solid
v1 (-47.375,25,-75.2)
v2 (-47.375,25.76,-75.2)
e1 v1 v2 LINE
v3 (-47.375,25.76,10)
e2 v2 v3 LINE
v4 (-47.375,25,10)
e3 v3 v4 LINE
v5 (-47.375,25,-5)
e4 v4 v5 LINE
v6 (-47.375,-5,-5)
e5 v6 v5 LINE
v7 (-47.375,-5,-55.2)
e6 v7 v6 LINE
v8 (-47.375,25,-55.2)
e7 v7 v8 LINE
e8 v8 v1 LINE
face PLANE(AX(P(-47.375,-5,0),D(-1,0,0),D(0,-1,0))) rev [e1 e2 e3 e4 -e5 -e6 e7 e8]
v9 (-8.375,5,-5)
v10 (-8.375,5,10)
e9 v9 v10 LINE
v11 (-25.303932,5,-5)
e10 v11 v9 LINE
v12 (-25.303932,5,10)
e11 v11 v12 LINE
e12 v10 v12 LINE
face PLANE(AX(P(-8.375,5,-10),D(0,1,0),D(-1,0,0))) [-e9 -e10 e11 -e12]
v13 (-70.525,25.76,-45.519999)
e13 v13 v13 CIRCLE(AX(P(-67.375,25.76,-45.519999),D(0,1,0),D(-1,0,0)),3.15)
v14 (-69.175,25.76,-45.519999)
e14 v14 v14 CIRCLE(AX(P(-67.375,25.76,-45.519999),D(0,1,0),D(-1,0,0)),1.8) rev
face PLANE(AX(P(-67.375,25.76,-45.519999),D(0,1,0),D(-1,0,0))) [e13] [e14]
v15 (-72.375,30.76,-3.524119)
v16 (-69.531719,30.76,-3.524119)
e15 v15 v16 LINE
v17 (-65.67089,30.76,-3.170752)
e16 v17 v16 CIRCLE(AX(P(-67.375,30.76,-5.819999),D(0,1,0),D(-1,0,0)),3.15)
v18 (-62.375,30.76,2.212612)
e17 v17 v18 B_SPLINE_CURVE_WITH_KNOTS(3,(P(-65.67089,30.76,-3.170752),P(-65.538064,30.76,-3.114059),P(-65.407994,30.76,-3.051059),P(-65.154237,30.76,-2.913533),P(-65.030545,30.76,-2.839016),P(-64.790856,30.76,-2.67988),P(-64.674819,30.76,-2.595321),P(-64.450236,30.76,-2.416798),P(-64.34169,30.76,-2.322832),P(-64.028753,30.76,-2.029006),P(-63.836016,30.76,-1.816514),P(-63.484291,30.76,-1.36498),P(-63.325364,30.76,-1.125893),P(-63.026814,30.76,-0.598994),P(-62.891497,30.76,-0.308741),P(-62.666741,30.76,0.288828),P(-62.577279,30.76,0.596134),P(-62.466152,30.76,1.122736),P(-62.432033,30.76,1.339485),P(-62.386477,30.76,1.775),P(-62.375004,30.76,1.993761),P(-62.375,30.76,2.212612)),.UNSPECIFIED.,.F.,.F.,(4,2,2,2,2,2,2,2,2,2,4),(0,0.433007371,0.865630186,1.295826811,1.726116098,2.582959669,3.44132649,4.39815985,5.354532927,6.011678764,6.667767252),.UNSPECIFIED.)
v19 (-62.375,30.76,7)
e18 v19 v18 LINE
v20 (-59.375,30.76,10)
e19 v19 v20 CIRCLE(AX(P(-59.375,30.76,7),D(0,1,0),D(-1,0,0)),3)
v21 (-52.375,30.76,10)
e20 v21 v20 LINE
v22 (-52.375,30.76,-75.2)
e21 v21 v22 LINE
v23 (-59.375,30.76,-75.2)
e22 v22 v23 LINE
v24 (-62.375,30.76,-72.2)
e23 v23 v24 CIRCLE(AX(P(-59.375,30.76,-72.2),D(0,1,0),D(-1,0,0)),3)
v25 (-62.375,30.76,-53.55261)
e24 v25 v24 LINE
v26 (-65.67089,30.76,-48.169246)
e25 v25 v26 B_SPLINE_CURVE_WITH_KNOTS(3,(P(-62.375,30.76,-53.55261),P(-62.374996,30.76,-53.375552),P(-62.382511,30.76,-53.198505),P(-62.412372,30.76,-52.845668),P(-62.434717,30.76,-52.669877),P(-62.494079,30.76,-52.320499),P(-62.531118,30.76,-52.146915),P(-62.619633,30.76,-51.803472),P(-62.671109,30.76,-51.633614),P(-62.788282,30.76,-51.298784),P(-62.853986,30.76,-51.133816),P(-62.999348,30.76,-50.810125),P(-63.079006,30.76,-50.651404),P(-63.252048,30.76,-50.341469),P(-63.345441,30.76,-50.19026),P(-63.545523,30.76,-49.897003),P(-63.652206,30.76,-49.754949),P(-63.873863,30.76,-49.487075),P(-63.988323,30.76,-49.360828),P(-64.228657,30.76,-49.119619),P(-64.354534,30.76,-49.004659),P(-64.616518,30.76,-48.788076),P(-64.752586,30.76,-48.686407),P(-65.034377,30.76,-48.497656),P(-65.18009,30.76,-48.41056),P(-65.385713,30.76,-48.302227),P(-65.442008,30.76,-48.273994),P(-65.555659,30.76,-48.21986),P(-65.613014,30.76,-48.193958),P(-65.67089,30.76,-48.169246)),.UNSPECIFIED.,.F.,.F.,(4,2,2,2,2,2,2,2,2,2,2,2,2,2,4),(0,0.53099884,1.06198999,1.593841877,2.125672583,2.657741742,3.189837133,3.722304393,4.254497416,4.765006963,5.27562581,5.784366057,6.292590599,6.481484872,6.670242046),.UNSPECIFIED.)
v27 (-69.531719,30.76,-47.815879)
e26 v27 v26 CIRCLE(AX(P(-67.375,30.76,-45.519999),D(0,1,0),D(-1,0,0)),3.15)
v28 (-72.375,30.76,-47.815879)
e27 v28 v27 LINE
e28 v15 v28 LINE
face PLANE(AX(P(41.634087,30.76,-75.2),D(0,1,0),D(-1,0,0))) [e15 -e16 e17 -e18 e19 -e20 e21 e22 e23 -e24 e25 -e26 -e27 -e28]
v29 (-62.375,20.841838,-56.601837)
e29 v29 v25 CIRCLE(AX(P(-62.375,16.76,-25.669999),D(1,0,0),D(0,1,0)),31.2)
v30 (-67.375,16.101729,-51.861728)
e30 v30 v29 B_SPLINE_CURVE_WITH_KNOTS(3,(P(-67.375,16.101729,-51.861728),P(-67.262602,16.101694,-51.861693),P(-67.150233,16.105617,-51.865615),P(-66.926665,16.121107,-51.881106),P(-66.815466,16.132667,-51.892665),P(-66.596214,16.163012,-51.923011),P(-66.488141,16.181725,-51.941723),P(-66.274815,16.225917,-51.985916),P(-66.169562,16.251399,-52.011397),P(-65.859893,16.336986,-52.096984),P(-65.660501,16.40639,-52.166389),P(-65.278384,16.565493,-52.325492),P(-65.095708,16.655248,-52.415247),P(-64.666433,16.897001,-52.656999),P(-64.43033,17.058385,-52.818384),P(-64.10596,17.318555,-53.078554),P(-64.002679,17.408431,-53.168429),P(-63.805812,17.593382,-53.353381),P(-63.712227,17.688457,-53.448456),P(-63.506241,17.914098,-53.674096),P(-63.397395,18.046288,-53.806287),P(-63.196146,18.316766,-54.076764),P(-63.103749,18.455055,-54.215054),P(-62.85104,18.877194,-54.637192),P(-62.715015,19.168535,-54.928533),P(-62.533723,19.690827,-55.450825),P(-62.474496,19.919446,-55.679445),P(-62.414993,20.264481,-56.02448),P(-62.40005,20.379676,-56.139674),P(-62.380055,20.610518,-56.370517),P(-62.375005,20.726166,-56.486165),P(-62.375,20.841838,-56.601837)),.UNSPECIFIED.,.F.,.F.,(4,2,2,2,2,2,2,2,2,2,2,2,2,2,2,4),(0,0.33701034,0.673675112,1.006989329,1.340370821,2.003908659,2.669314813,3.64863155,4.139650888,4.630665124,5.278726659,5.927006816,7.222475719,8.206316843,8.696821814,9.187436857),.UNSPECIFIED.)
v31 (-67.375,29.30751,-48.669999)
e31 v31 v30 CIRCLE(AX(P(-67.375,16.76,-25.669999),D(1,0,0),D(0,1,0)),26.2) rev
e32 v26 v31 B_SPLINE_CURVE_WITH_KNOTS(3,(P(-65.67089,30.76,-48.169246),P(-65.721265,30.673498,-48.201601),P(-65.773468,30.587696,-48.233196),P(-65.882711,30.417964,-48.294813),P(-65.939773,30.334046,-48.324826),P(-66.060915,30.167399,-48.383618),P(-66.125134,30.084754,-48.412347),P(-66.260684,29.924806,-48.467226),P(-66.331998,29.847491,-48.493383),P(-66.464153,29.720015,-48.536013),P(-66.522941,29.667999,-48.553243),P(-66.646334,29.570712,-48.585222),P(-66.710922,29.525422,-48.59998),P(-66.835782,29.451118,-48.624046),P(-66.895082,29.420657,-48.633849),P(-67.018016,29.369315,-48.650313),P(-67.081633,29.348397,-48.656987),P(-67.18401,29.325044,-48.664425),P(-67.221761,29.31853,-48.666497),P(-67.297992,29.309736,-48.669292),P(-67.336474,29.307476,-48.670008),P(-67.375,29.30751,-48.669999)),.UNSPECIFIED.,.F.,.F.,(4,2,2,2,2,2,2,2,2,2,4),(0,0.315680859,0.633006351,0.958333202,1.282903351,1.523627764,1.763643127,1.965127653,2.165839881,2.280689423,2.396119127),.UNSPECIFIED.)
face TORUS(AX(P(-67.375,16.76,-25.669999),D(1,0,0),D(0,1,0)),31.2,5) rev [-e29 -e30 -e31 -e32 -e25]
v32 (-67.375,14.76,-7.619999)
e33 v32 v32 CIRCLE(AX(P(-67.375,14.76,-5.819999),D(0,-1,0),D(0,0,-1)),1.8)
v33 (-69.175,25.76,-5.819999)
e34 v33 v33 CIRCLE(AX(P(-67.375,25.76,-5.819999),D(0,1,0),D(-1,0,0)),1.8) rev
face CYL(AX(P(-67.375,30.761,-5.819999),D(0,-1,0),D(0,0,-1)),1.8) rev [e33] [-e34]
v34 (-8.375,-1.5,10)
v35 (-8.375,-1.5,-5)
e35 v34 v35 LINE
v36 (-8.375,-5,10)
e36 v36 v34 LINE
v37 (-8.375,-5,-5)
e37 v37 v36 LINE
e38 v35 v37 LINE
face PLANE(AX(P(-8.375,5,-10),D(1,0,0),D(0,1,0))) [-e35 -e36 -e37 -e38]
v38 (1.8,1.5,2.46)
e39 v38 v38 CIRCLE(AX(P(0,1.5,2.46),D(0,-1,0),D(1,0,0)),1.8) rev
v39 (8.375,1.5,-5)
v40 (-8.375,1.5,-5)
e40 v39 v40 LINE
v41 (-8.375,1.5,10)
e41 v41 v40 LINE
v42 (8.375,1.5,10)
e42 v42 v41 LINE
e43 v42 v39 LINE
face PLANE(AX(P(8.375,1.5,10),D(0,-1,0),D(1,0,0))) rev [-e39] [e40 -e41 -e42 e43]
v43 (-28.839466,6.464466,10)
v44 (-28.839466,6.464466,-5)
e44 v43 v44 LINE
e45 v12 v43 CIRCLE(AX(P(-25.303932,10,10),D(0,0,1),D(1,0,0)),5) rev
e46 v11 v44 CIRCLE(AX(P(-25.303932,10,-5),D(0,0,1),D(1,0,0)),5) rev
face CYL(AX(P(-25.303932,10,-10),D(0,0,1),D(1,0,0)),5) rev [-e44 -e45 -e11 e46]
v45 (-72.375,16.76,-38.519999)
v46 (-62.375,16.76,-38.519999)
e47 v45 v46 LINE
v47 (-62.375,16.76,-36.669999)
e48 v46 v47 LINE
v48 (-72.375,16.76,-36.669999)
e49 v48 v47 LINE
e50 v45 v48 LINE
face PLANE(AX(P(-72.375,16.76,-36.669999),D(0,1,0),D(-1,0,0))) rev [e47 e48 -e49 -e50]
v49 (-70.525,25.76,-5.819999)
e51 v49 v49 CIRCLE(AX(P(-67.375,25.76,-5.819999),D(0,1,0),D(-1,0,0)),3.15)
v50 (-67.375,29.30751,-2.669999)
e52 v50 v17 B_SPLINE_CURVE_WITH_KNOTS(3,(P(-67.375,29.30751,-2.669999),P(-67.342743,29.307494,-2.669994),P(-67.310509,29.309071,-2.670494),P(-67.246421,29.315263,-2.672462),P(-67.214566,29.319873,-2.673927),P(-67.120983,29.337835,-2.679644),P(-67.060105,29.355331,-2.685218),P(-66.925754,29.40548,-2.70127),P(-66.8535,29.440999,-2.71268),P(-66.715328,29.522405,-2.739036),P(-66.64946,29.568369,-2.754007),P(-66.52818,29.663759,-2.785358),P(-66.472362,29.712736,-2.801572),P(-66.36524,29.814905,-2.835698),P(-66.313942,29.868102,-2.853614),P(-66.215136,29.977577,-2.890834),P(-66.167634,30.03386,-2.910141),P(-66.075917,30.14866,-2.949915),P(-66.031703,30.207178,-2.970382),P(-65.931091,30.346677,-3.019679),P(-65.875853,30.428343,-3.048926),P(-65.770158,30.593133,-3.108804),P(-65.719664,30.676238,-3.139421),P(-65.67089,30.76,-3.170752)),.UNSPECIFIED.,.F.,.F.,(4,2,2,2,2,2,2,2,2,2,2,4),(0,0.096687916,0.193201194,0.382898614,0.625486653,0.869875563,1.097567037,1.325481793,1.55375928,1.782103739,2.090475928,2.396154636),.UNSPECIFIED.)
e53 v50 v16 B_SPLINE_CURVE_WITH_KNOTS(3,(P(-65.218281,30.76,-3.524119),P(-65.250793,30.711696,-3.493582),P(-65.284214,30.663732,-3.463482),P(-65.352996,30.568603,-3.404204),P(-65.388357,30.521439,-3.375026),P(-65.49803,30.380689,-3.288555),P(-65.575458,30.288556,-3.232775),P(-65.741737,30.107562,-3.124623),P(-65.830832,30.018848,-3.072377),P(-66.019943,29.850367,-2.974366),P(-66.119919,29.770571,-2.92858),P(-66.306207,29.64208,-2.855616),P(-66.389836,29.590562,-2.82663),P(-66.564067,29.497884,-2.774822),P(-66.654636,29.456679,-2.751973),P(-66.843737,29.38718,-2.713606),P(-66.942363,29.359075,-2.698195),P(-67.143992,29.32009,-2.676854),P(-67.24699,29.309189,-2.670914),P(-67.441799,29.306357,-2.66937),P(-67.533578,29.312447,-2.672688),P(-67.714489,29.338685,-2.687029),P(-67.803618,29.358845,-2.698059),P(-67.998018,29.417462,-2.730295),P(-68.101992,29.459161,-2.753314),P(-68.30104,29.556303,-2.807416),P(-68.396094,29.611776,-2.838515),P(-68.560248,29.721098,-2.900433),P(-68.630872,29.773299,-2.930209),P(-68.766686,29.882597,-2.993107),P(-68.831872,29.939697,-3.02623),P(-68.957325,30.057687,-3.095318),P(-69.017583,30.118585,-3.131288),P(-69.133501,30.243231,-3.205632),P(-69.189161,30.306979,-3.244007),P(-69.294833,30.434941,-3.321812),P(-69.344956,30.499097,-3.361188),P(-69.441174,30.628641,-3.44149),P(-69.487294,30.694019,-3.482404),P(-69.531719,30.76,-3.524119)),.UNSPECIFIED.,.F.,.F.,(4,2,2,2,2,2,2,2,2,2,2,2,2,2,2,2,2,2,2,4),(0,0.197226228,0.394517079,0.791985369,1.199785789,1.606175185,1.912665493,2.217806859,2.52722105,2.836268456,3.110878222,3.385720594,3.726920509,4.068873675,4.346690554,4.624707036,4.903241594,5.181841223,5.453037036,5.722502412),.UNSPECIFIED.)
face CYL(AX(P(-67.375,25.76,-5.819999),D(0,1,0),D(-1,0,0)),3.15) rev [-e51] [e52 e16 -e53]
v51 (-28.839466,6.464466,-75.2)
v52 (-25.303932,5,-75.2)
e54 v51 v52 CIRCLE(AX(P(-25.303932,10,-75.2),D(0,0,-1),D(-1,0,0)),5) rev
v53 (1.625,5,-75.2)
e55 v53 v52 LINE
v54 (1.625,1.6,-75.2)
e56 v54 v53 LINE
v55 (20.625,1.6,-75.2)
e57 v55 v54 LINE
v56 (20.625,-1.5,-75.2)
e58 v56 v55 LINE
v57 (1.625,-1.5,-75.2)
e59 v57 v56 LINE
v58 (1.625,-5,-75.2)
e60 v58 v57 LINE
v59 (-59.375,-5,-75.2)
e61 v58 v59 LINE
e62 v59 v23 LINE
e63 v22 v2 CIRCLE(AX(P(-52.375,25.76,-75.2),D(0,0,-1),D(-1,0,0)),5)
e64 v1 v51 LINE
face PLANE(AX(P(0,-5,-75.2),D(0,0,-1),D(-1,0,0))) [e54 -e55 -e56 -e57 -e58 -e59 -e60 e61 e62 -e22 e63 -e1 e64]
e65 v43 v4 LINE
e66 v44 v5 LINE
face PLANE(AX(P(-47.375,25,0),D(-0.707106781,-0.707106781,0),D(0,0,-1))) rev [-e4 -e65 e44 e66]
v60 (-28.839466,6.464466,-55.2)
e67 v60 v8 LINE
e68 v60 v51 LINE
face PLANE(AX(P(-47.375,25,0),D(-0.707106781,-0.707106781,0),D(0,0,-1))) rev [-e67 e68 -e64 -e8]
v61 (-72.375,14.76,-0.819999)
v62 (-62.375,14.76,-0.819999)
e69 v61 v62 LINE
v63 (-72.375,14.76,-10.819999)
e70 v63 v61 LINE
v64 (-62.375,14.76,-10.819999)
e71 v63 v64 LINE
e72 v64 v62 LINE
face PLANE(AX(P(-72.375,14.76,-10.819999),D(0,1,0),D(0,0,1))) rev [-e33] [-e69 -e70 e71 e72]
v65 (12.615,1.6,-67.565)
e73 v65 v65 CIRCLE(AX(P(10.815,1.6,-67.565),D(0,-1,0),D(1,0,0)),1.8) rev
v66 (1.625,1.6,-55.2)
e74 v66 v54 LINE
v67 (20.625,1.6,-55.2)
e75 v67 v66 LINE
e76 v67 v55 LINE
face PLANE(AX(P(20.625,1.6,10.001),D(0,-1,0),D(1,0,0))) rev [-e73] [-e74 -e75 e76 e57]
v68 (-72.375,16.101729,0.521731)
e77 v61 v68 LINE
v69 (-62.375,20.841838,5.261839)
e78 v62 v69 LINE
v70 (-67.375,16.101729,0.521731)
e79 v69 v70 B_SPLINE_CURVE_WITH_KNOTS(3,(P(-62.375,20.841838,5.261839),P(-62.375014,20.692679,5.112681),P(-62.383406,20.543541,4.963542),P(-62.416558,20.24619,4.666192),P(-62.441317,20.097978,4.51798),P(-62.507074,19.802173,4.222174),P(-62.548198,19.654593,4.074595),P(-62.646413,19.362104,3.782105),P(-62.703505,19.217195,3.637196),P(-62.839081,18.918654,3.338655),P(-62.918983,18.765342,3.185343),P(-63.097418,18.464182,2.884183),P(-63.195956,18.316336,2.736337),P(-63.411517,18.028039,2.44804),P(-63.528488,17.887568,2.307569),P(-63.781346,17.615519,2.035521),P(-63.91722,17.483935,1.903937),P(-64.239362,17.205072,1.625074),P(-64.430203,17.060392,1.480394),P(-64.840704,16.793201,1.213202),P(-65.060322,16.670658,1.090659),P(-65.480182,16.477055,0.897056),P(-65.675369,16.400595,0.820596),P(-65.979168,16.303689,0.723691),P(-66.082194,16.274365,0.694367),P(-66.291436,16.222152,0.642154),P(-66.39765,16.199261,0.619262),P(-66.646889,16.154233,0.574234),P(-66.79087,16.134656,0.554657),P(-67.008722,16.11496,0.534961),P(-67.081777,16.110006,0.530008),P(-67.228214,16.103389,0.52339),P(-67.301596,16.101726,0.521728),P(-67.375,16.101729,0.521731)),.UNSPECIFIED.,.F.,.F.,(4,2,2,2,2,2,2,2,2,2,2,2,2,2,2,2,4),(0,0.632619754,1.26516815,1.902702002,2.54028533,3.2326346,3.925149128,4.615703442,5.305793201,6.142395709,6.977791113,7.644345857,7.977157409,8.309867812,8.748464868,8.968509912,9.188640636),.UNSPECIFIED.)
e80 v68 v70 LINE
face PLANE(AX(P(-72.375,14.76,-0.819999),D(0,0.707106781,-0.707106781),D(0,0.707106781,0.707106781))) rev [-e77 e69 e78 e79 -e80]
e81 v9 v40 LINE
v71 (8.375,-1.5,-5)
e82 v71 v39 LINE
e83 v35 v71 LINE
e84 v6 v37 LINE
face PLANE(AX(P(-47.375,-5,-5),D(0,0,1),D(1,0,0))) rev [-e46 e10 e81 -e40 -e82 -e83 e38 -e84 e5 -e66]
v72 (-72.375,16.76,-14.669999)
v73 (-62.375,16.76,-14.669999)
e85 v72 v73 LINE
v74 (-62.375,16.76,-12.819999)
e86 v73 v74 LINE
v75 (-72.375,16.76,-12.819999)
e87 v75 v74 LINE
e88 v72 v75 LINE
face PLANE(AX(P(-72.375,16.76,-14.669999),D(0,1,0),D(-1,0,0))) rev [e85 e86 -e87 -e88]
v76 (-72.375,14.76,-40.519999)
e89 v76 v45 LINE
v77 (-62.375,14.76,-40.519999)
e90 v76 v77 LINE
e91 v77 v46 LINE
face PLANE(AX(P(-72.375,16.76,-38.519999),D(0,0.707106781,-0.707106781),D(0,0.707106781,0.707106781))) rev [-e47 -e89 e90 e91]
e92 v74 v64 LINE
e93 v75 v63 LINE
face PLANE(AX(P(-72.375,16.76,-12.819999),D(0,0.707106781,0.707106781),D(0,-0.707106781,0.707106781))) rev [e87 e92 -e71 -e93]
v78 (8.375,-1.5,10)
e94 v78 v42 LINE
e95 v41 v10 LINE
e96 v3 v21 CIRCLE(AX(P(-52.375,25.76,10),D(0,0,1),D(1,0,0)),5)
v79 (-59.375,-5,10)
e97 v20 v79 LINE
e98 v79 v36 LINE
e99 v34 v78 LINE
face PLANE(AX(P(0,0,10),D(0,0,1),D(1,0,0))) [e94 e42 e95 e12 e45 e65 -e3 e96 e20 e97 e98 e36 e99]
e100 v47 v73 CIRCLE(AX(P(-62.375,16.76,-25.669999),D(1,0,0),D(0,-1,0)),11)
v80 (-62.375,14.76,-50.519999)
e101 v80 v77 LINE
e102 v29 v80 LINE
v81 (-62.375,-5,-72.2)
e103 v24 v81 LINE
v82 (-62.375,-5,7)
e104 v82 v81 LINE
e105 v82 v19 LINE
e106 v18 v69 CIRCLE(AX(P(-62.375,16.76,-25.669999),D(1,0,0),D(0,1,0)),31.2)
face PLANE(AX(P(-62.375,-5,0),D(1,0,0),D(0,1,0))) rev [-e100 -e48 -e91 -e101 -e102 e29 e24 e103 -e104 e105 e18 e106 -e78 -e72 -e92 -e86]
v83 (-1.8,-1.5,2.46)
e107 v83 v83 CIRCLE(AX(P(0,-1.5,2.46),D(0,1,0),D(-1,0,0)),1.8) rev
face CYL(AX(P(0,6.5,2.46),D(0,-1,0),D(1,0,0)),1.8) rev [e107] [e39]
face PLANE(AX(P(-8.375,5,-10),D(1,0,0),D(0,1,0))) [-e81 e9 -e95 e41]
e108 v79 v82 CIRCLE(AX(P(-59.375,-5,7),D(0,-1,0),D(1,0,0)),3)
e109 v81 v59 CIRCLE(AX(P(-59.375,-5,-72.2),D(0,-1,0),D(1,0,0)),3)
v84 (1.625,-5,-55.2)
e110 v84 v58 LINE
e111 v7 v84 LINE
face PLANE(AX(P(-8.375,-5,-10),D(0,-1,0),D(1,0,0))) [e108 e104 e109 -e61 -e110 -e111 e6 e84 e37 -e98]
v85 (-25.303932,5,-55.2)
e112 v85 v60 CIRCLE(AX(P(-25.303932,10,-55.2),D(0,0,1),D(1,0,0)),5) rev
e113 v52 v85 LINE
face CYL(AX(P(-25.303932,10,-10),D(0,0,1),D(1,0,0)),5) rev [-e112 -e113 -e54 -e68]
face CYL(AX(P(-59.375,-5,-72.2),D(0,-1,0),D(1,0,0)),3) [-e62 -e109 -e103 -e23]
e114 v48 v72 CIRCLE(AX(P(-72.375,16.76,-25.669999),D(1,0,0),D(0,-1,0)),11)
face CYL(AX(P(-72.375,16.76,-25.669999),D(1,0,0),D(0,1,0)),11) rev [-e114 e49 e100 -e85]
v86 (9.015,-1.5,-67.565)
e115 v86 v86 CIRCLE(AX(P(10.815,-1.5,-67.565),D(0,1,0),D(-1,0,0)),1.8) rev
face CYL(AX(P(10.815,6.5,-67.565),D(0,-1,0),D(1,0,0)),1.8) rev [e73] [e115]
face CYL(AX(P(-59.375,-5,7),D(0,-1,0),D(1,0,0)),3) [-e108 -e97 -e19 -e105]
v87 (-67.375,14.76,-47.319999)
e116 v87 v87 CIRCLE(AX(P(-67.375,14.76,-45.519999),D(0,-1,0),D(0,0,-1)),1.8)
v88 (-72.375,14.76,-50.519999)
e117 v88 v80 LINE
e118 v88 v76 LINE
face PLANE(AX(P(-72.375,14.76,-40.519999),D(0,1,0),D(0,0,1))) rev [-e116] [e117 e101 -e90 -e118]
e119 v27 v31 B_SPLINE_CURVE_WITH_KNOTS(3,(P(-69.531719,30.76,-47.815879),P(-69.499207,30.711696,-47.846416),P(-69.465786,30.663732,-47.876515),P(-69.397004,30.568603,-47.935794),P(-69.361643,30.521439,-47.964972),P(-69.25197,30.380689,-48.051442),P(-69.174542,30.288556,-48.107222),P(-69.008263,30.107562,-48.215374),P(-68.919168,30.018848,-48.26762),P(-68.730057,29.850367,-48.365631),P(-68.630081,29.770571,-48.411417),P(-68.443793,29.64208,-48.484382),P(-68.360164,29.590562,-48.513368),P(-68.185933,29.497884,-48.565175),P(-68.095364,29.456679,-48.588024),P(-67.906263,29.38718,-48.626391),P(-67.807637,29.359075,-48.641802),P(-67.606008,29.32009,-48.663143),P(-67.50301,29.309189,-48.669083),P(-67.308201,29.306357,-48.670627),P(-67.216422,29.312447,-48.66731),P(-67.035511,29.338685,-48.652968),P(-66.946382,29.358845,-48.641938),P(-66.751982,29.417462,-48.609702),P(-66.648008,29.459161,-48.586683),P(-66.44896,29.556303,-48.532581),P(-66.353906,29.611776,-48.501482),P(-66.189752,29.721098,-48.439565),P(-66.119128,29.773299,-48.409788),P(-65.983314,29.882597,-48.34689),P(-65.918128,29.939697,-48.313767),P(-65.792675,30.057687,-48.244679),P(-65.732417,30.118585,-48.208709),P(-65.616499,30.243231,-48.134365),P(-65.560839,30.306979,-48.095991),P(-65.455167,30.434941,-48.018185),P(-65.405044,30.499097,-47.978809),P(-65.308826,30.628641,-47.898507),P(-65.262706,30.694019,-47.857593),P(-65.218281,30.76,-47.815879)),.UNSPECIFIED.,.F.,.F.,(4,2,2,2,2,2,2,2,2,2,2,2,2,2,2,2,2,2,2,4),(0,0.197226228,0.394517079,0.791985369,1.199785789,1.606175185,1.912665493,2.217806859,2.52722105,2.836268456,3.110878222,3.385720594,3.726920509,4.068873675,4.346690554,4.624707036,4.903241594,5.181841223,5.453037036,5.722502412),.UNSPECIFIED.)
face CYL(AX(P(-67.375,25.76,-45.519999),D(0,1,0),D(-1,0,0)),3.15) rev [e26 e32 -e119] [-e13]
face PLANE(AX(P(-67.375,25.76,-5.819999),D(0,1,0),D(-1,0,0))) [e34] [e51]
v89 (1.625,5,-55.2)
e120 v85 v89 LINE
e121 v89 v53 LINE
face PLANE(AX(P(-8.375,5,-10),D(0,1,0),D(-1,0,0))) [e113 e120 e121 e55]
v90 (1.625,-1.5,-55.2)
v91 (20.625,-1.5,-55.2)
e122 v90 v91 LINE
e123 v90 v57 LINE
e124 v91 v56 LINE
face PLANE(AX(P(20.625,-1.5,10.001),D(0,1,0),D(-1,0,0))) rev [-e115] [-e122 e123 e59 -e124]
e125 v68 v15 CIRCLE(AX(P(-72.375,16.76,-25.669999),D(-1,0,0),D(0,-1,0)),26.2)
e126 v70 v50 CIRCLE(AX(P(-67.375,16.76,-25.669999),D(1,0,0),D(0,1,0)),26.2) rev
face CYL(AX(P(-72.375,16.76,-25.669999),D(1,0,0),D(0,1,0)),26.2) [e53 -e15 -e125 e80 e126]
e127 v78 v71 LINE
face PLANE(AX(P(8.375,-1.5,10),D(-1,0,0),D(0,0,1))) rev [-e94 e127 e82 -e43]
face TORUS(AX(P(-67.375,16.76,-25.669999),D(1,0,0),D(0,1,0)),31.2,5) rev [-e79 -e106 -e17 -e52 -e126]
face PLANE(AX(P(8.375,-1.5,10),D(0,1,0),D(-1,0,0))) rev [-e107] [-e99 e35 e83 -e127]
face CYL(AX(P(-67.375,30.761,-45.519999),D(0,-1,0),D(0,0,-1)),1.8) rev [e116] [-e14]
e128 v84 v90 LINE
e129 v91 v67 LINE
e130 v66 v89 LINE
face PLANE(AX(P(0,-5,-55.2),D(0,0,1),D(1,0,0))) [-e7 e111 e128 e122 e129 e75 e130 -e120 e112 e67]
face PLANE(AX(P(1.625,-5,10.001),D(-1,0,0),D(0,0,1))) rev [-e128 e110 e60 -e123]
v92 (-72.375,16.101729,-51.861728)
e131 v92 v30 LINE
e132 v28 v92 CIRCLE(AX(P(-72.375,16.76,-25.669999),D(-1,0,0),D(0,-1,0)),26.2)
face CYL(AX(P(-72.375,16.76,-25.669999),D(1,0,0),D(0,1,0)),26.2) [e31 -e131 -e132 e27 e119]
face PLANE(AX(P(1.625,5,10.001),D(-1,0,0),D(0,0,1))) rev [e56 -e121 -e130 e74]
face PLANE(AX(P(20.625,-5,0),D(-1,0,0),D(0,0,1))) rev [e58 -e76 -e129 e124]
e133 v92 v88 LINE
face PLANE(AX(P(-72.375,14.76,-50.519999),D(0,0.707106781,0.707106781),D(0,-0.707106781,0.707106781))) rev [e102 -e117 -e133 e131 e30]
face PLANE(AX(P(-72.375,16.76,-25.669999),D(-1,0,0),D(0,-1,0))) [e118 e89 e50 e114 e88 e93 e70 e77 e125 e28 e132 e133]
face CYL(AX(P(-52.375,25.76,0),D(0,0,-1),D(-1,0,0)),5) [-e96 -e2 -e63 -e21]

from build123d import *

# Parameters (mm, degrees)
ESBO_O1_W                         = 16.75
ESBO_O1_H                         = 3
RESSALTO_EXTRUS_O1_DEPTH          = 10
ESBO_O2_W                         = 39
ESBO_O2_H                         = 10
RESSALTO_EXTRUS_O2_DEPTH          = 20
ESBO_O3_W                         = 68
ESBO_O3_H                         = 20
RESSALTO_EXTRUS_O3_DEPTH          = 10
CORTE_EXTRUS_O1_REACH             = 107.71
ESBO_O4_W                         = 19
ESBO_O4_H                         = 3.5
ESBO_O4_H_2                       = 3.4
ESBO_O5_W                         = 85.2
ESBO_O5_H                         = 25.76
RESSALTO_EXTRUS_O4_DEPTH          = 15
RESSALTO_EXTRUS_O5_DEPTH          = 10
CORTE_EXTRUS_O2_REACH             = 108.224
ESBO_O7_R                         = 1.8
ESBO_O8_R                         = 3.15
CORTE_EXTRUS_O3_DEPTH             = 5
CHANFRO1_SIZE                     = 20
FILETE1_R                         = 5
FILETE4_R                         = 3
FILETE5_R                         = 5
FILETE6_R                         = 5
CORTE_EXTRUS_O4_REACH             = 110.394
ESBO_O9_R                         = 1.8
CORTE_EXTRUS_O4_DIRECTION_2_DEPTH = 5
ESBO_O10_W                        = 55.75
ESBO_O10_H                        = 5
CORTE_EXTRUS_O5_DEPTH             = 111.326598128


with BuildPart() as part:
    # Esboço1 → Ressalto-extrusão1 (new, symmetric)
    with BuildSketch(Plane.XY):
        Rectangle(ESBO_O1_W, ESBO_O1_H)
    extrude(amount=RESSALTO_EXTRUS_O1_DEPTH, both=True)

    # Esboço2 → Ressalto-extrusão2 (add, through all)
    with BuildSketch(Plane.XY.offset(10)):
        with Locations((-27.875, 0)):
            Rectangle(ESBO_O2_W, ESBO_O2_H)
    extrude(amount=-RESSALTO_EXTRUS_O2_DEPTH)

    # Esboço3 → Ressalto-extrusão3 (add, through all)
    with BuildSketch(Plane(origin=(0, 5, 0), x_dir=(1, 0, 0), z_dir=(0, 1, 0))):
        Polygon((-62.375, -10), (-47.375, -10), (-47.375, 10), (-47.375, 55.2), (-47.375, 75.2), (-62.375, 75.2), align=None)
        with Locations((-13.375, 65.2)):
            Rectangle(ESBO_O3_W, ESBO_O3_H)
    extrude(amount=-RESSALTO_EXTRUS_O3_DEPTH)

    # Esboço4 → Corte-extrusão1 (cut, up to next)
    with BuildSketch(Plane(origin=(0, 0, -75.2), x_dir=(-1, 0, 0), z_dir=(0, 0, -1)), mode=Mode.PRIVATE) as corte_extrus_o1_sk1:
        with Locations((-11.125, -3.25)):
            Rectangle(ESBO_O4_W, ESBO_O4_H)
    corte_extrus_o1_tool1 = extrude(corte_extrus_o1_sk1.sketch, amount=-CORTE_EXTRUS_O1_REACH, mode=Mode.PRIVATE) & part.part
    # Esboço4 → Corte-extrusão1 (cut, up to next)
    with BuildSketch(Plane(origin=(0, 0, -75.2), x_dir=(-1, 0, 0), z_dir=(0, 0, -1)), mode=Mode.PRIVATE) as corte_extrus_o1_sk2:
        with Locations((-11.125, 3.3)):
            Rectangle(ESBO_O4_W, ESBO_O4_H_2)
    corte_extrus_o1_tool2 = extrude(corte_extrus_o1_sk2.sketch, amount=-CORTE_EXTRUS_O1_REACH, mode=Mode.PRIVATE) & part.part
    add(corte_extrus_o1_tool1.solids().sort_by_distance((11.125, -3.25, -75.2))[0], mode=Mode.SUBTRACT)
    add(corte_extrus_o1_tool2.solids().sort_by_distance((11.125, 3.3, -75.2))[0], mode=Mode.SUBTRACT)

    # Esboço5 → Ressalto-extrusão4 (add)
    with BuildSketch(Plane.ZY.offset(62.375)):
        with Locations((-32.6, 17.88)):
            Rectangle(ESBO_O5_W, ESBO_O5_H)
    extrude(amount=-RESSALTO_EXTRUS_O4_DEPTH)

    # Esboço6 → Ressalto-extrusão5 (add)
    with BuildSketch(Plane.ZY.offset(62.375)):
        with BuildLine():
            Line((-36.669998569, 16.76), (-38.519998569, 16.76))
            Line((-38.519998569, 16.76), (-40.519998569, 14.76))
            Line((-40.519998569, 14.76), (-50.519998569, 14.76))
            Line((-50.519998569, 14.76), (-51.86172779, 16.101729221))
            ThreePointArc((-51.86172779, 16.101729221), (-50.925638362, 23.730843469), (-47.815878547, 30.76))
            Line((-47.815878547, 30.76), (-3.524118591, 30.76))
            ThreePointArc((-3.524118591, 30.76), (-0.414358777, 23.730843469), (0.521730651, 16.101729221))
            Line((0.521730651, 16.101729221), (-0.819998569, 14.76))
            Line((-0.819998569, 14.76), (-10.819998569, 14.76))
            Line((-10.819998569, 14.76), (-12.819998569, 16.76))
            Line((-12.819998569, 16.76), (-14.669998569, 16.76))
            ThreePointArc((-14.669998569, 16.76), (-25.669998569, 27.76), (-36.669998569, 16.76))
        make_face()
    extrude(amount=RESSALTO_EXTRUS_O5_DEPTH)

    # Esboço7 → Corte-extrusão2 (cut, up to next)
    with BuildSketch(Plane.XZ.offset(-14.76), mode=Mode.PRIVATE) as corte_extrus_o2_sk1:
        with Locations(Location((-67.375, -5.819998569, 0), (0, 0, 270))):
            Circle(ESBO_O7_R)
    corte_extrus_o2_tool1 = extrude(corte_extrus_o2_sk1.sketch, amount=-CORTE_EXTRUS_O2_REACH, mode=Mode.PRIVATE) & part.part
    # Esboço7 → Corte-extrusão2 (cut, up to next)
    with BuildSketch(Plane.XZ.offset(-14.76), mode=Mode.PRIVATE) as corte_extrus_o2_sk2:
        with Locations(Location((-67.375, -45.519998569, 0), (0, 0, 270))):
            Circle(ESBO_O7_R)
    corte_extrus_o2_tool2 = extrude(corte_extrus_o2_sk2.sketch, amount=-CORTE_EXTRUS_O2_REACH, mode=Mode.PRIVATE) & part.part
    add(corte_extrus_o2_tool1.solids().sort_by_distance((-67.375, 14.76, -5.819999))[0], mode=Mode.SUBTRACT)
    add(corte_extrus_o2_tool2.solids().sort_by_distance((-67.375, 14.76, -45.519999))[0], mode=Mode.SUBTRACT)

    # Esboço8 → Corte-extrusão3 (cut)
    with BuildSketch(Plane(origin=(0, 30.76, 0), x_dir=(1, 0, 0), z_dir=(0, 1, 0))):
        with Locations(Location((-67.375, 45.519998569, 0), (0, 0, 180))):
            Circle(ESBO_O8_R)
        with Locations(Location((-67.375, 5.819998569, 0), (0, 0, 180))):
            Circle(ESBO_O8_R)
    extrude(amount=-CORTE_EXTRUS_O3_DEPTH, mode=Mode.SUBTRACT)

    # Chanfro1
    chanfro1_edges = [part.edges().sort_by_distance(p)[0] for p in [
        (-47.375, 5, -65.2),
        (-47.375, 5, 0),
    ]]
    chamfer(chanfro1_edges, length=CHANFRO1_SIZE)

    # Filete1
    # the kernel refuses this fillet: 5 mm, written as the material it adds along each edge
    with BuildSketch(Plane(origin=(-62.375, 16.76, -25.669998569), x_dir=(0, -0.4814020816411878, -0.8764998778046299), z_dir=(0, -0.8764998778046299, 0.4814020816411878))) as filete1_piece_1_section:
        with BuildLine():
            CenterArc((26.2 + FILETE1_R, -FILETE1_R), FILETE1_R, 90, 90)
            Line((26.2, -FILETE1_R), (26.2, 0))
            Line((26.2, 0), (26.2 + FILETE1_R, 0))
        make_face()
    filete1_piece_1 = revolve(axis=Axis((-62.375, 16.76, -25.669998569), (1, 0, 0)), revolution_arc=88.414248189, mode=Mode.PRIVATE)
    filete1_piece_1 = split(filete1_piece_1, bisect_by=Plane(origin=(-63.543022515, 30.76, -51.592589171), z_dir=(0, -1, 0)), keep=Keep.TOP, mode=Mode.PRIVATE)
    filete1_piece_1 = split(filete1_piece_1, bisect_by=Plane(origin=(-63.543022515, 19.962032762, -55.722031332), z_dir=(0, 0.7071067811865495, 0.7071067811865457)), keep=Keep.TOP, mode=Mode.PRIVATE)
    filete1_piece_1 = filete1_piece_1 - Plane(origin=(-67.375, 24.091474922, -45.519998569), x_dir=(-1, 0, 0), z_dir=(0, 1, 0)) * Cylinder(3.15, 125, mode=Mode.PRIVATE)
    add(filete1_piece_1)
    with BuildSketch(Plane(origin=(-62.375, 16.76, -25.669998569), x_dir=(0, 0.8628423353119256, 0.5054731490331239), z_dir=(0, 0.5054731490331239, -0.8628423353119256))) as filete1_piece_2_section:
        with BuildLine():
            CenterArc((26.2 + FILETE1_R, -FILETE1_R), FILETE1_R, 90, 90)
            Line((26.2, -FILETE1_R), (26.2, 0))
            Line((26.2, 0), (26.2 + FILETE1_R, 0))
        make_face()
    filete1_piece_2 = revolve(axis=Axis((-62.375, 16.76, -25.669998569), (1, 0, 0)), revolution_arc=88.414248189, mode=Mode.PRIVATE)
    filete1_piece_2 = split(filete1_piece_2, bisect_by=Plane(origin=(-63.543022328, 19.962032891, 4.382034321), z_dir=(0, 0.7071067811865496, -0.7071067811865455)), keep=Keep.TOP, mode=Mode.PRIVATE)
    filete1_piece_2 = split(filete1_piece_2, bisect_by=Plane(origin=(-63.543022328, 30.76, 0.252591971), z_dir=(0, -1, 0)), keep=Keep.TOP, mode=Mode.PRIVATE)
    filete1_piece_2 = filete1_piece_2 - Plane(origin=(-67.375, 24.091475241, -5.819998569), x_dir=(-1, 0, 0), z_dir=(0, 1, 0)) * Cylinder(3.15, 125, mode=Mode.PRIVATE)
    add(filete1_piece_2)

    # Filete4
    filete4_edges = [part.edges().sort_by_distance(p)[0] for p in [
        (-62.375, 12.88, 10),
        (-62.375, 12.88, -75.2),
    ]]
    fillet(filete4_edges, radius=FILETE4_R)

    # Filete5
    filete5_edges = [part.edges().sort_by_distance(p)[0] for p in [
        (-47.375, 30.76, -32.6),
    ]]
    fillet(filete5_edges, radius=FILETE5_R)

    # Filete6
    filete6_edges = [part.edges().sort_by_distance(p)[0] for p in [
        (-27.375, 5, -65.2),
        (-27.375, 5, 0),
    ]]
    fillet(filete6_edges, radius=FILETE6_R)

    # Esboço9 → Corte-extrusão4 (cut, up to next)
    with BuildSketch(Plane(origin=(0, 1.5, 0), x_dir=(1, 0, 0), z_dir=(0, 1, 0)), mode=Mode.PRIVATE) as corte_extrus_o4_sk1:
        with Locations((0, -2.46)):
            Circle(ESBO_O9_R)
    corte_extrus_o4_tool1 = extrude(corte_extrus_o4_sk1.sketch, amount=-CORTE_EXTRUS_O4_REACH, mode=Mode.PRIVATE) & part.part
    # Esboço9 → Corte-extrusão4 (cut, up to next)
    with BuildSketch(Plane(origin=(0, 1.5, 0), x_dir=(1, 0, 0), z_dir=(0, 1, 0)), mode=Mode.PRIVATE) as corte_extrus_o4_sk2:
        with Locations((10.815, 67.565)):
            Circle(ESBO_O9_R)
    corte_extrus_o4_tool2 = extrude(corte_extrus_o4_sk2.sketch, amount=-CORTE_EXTRUS_O4_REACH, mode=Mode.PRIVATE) & part.part
    add(corte_extrus_o4_tool1.solids().sort_by_distance((0, 1.5, 2.46))[0], mode=Mode.SUBTRACT)
    add(corte_extrus_o4_tool2.solids().sort_by_distance((10.815, 1.5, -67.565))[0], mode=Mode.SUBTRACT)

    # Esboço9 → Corte-extrusão4 direction 2 (cut)
    with BuildSketch(Plane(origin=(0, 1.5, 0), x_dir=(1, 0, 0), z_dir=(0, 1, 0))):
        with Locations((0, -2.46)):
            Circle(ESBO_O9_R)
        with Locations((10.815, 67.565)):
            Circle(ESBO_O9_R)
    extrude(amount=CORTE_EXTRUS_O4_DIRECTION_2_DEPTH, mode=Mode.SUBTRACT)

    # Esboço10 → Corte-extrusão5 (cut, through all)
    with BuildSketch(Plane(origin=(0, 30.76, 0), x_dir=(1, 0, 0), z_dir=(0, 1, 0))):
        with Locations((-19.5, 7.5)):
            Rectangle(ESBO_O10_W, ESBO_O10_H)
    extrude(amount=-CORTE_EXTRUS_O5_DEPTH, mode=Mode.SUBTRACT)


solid = part.part
